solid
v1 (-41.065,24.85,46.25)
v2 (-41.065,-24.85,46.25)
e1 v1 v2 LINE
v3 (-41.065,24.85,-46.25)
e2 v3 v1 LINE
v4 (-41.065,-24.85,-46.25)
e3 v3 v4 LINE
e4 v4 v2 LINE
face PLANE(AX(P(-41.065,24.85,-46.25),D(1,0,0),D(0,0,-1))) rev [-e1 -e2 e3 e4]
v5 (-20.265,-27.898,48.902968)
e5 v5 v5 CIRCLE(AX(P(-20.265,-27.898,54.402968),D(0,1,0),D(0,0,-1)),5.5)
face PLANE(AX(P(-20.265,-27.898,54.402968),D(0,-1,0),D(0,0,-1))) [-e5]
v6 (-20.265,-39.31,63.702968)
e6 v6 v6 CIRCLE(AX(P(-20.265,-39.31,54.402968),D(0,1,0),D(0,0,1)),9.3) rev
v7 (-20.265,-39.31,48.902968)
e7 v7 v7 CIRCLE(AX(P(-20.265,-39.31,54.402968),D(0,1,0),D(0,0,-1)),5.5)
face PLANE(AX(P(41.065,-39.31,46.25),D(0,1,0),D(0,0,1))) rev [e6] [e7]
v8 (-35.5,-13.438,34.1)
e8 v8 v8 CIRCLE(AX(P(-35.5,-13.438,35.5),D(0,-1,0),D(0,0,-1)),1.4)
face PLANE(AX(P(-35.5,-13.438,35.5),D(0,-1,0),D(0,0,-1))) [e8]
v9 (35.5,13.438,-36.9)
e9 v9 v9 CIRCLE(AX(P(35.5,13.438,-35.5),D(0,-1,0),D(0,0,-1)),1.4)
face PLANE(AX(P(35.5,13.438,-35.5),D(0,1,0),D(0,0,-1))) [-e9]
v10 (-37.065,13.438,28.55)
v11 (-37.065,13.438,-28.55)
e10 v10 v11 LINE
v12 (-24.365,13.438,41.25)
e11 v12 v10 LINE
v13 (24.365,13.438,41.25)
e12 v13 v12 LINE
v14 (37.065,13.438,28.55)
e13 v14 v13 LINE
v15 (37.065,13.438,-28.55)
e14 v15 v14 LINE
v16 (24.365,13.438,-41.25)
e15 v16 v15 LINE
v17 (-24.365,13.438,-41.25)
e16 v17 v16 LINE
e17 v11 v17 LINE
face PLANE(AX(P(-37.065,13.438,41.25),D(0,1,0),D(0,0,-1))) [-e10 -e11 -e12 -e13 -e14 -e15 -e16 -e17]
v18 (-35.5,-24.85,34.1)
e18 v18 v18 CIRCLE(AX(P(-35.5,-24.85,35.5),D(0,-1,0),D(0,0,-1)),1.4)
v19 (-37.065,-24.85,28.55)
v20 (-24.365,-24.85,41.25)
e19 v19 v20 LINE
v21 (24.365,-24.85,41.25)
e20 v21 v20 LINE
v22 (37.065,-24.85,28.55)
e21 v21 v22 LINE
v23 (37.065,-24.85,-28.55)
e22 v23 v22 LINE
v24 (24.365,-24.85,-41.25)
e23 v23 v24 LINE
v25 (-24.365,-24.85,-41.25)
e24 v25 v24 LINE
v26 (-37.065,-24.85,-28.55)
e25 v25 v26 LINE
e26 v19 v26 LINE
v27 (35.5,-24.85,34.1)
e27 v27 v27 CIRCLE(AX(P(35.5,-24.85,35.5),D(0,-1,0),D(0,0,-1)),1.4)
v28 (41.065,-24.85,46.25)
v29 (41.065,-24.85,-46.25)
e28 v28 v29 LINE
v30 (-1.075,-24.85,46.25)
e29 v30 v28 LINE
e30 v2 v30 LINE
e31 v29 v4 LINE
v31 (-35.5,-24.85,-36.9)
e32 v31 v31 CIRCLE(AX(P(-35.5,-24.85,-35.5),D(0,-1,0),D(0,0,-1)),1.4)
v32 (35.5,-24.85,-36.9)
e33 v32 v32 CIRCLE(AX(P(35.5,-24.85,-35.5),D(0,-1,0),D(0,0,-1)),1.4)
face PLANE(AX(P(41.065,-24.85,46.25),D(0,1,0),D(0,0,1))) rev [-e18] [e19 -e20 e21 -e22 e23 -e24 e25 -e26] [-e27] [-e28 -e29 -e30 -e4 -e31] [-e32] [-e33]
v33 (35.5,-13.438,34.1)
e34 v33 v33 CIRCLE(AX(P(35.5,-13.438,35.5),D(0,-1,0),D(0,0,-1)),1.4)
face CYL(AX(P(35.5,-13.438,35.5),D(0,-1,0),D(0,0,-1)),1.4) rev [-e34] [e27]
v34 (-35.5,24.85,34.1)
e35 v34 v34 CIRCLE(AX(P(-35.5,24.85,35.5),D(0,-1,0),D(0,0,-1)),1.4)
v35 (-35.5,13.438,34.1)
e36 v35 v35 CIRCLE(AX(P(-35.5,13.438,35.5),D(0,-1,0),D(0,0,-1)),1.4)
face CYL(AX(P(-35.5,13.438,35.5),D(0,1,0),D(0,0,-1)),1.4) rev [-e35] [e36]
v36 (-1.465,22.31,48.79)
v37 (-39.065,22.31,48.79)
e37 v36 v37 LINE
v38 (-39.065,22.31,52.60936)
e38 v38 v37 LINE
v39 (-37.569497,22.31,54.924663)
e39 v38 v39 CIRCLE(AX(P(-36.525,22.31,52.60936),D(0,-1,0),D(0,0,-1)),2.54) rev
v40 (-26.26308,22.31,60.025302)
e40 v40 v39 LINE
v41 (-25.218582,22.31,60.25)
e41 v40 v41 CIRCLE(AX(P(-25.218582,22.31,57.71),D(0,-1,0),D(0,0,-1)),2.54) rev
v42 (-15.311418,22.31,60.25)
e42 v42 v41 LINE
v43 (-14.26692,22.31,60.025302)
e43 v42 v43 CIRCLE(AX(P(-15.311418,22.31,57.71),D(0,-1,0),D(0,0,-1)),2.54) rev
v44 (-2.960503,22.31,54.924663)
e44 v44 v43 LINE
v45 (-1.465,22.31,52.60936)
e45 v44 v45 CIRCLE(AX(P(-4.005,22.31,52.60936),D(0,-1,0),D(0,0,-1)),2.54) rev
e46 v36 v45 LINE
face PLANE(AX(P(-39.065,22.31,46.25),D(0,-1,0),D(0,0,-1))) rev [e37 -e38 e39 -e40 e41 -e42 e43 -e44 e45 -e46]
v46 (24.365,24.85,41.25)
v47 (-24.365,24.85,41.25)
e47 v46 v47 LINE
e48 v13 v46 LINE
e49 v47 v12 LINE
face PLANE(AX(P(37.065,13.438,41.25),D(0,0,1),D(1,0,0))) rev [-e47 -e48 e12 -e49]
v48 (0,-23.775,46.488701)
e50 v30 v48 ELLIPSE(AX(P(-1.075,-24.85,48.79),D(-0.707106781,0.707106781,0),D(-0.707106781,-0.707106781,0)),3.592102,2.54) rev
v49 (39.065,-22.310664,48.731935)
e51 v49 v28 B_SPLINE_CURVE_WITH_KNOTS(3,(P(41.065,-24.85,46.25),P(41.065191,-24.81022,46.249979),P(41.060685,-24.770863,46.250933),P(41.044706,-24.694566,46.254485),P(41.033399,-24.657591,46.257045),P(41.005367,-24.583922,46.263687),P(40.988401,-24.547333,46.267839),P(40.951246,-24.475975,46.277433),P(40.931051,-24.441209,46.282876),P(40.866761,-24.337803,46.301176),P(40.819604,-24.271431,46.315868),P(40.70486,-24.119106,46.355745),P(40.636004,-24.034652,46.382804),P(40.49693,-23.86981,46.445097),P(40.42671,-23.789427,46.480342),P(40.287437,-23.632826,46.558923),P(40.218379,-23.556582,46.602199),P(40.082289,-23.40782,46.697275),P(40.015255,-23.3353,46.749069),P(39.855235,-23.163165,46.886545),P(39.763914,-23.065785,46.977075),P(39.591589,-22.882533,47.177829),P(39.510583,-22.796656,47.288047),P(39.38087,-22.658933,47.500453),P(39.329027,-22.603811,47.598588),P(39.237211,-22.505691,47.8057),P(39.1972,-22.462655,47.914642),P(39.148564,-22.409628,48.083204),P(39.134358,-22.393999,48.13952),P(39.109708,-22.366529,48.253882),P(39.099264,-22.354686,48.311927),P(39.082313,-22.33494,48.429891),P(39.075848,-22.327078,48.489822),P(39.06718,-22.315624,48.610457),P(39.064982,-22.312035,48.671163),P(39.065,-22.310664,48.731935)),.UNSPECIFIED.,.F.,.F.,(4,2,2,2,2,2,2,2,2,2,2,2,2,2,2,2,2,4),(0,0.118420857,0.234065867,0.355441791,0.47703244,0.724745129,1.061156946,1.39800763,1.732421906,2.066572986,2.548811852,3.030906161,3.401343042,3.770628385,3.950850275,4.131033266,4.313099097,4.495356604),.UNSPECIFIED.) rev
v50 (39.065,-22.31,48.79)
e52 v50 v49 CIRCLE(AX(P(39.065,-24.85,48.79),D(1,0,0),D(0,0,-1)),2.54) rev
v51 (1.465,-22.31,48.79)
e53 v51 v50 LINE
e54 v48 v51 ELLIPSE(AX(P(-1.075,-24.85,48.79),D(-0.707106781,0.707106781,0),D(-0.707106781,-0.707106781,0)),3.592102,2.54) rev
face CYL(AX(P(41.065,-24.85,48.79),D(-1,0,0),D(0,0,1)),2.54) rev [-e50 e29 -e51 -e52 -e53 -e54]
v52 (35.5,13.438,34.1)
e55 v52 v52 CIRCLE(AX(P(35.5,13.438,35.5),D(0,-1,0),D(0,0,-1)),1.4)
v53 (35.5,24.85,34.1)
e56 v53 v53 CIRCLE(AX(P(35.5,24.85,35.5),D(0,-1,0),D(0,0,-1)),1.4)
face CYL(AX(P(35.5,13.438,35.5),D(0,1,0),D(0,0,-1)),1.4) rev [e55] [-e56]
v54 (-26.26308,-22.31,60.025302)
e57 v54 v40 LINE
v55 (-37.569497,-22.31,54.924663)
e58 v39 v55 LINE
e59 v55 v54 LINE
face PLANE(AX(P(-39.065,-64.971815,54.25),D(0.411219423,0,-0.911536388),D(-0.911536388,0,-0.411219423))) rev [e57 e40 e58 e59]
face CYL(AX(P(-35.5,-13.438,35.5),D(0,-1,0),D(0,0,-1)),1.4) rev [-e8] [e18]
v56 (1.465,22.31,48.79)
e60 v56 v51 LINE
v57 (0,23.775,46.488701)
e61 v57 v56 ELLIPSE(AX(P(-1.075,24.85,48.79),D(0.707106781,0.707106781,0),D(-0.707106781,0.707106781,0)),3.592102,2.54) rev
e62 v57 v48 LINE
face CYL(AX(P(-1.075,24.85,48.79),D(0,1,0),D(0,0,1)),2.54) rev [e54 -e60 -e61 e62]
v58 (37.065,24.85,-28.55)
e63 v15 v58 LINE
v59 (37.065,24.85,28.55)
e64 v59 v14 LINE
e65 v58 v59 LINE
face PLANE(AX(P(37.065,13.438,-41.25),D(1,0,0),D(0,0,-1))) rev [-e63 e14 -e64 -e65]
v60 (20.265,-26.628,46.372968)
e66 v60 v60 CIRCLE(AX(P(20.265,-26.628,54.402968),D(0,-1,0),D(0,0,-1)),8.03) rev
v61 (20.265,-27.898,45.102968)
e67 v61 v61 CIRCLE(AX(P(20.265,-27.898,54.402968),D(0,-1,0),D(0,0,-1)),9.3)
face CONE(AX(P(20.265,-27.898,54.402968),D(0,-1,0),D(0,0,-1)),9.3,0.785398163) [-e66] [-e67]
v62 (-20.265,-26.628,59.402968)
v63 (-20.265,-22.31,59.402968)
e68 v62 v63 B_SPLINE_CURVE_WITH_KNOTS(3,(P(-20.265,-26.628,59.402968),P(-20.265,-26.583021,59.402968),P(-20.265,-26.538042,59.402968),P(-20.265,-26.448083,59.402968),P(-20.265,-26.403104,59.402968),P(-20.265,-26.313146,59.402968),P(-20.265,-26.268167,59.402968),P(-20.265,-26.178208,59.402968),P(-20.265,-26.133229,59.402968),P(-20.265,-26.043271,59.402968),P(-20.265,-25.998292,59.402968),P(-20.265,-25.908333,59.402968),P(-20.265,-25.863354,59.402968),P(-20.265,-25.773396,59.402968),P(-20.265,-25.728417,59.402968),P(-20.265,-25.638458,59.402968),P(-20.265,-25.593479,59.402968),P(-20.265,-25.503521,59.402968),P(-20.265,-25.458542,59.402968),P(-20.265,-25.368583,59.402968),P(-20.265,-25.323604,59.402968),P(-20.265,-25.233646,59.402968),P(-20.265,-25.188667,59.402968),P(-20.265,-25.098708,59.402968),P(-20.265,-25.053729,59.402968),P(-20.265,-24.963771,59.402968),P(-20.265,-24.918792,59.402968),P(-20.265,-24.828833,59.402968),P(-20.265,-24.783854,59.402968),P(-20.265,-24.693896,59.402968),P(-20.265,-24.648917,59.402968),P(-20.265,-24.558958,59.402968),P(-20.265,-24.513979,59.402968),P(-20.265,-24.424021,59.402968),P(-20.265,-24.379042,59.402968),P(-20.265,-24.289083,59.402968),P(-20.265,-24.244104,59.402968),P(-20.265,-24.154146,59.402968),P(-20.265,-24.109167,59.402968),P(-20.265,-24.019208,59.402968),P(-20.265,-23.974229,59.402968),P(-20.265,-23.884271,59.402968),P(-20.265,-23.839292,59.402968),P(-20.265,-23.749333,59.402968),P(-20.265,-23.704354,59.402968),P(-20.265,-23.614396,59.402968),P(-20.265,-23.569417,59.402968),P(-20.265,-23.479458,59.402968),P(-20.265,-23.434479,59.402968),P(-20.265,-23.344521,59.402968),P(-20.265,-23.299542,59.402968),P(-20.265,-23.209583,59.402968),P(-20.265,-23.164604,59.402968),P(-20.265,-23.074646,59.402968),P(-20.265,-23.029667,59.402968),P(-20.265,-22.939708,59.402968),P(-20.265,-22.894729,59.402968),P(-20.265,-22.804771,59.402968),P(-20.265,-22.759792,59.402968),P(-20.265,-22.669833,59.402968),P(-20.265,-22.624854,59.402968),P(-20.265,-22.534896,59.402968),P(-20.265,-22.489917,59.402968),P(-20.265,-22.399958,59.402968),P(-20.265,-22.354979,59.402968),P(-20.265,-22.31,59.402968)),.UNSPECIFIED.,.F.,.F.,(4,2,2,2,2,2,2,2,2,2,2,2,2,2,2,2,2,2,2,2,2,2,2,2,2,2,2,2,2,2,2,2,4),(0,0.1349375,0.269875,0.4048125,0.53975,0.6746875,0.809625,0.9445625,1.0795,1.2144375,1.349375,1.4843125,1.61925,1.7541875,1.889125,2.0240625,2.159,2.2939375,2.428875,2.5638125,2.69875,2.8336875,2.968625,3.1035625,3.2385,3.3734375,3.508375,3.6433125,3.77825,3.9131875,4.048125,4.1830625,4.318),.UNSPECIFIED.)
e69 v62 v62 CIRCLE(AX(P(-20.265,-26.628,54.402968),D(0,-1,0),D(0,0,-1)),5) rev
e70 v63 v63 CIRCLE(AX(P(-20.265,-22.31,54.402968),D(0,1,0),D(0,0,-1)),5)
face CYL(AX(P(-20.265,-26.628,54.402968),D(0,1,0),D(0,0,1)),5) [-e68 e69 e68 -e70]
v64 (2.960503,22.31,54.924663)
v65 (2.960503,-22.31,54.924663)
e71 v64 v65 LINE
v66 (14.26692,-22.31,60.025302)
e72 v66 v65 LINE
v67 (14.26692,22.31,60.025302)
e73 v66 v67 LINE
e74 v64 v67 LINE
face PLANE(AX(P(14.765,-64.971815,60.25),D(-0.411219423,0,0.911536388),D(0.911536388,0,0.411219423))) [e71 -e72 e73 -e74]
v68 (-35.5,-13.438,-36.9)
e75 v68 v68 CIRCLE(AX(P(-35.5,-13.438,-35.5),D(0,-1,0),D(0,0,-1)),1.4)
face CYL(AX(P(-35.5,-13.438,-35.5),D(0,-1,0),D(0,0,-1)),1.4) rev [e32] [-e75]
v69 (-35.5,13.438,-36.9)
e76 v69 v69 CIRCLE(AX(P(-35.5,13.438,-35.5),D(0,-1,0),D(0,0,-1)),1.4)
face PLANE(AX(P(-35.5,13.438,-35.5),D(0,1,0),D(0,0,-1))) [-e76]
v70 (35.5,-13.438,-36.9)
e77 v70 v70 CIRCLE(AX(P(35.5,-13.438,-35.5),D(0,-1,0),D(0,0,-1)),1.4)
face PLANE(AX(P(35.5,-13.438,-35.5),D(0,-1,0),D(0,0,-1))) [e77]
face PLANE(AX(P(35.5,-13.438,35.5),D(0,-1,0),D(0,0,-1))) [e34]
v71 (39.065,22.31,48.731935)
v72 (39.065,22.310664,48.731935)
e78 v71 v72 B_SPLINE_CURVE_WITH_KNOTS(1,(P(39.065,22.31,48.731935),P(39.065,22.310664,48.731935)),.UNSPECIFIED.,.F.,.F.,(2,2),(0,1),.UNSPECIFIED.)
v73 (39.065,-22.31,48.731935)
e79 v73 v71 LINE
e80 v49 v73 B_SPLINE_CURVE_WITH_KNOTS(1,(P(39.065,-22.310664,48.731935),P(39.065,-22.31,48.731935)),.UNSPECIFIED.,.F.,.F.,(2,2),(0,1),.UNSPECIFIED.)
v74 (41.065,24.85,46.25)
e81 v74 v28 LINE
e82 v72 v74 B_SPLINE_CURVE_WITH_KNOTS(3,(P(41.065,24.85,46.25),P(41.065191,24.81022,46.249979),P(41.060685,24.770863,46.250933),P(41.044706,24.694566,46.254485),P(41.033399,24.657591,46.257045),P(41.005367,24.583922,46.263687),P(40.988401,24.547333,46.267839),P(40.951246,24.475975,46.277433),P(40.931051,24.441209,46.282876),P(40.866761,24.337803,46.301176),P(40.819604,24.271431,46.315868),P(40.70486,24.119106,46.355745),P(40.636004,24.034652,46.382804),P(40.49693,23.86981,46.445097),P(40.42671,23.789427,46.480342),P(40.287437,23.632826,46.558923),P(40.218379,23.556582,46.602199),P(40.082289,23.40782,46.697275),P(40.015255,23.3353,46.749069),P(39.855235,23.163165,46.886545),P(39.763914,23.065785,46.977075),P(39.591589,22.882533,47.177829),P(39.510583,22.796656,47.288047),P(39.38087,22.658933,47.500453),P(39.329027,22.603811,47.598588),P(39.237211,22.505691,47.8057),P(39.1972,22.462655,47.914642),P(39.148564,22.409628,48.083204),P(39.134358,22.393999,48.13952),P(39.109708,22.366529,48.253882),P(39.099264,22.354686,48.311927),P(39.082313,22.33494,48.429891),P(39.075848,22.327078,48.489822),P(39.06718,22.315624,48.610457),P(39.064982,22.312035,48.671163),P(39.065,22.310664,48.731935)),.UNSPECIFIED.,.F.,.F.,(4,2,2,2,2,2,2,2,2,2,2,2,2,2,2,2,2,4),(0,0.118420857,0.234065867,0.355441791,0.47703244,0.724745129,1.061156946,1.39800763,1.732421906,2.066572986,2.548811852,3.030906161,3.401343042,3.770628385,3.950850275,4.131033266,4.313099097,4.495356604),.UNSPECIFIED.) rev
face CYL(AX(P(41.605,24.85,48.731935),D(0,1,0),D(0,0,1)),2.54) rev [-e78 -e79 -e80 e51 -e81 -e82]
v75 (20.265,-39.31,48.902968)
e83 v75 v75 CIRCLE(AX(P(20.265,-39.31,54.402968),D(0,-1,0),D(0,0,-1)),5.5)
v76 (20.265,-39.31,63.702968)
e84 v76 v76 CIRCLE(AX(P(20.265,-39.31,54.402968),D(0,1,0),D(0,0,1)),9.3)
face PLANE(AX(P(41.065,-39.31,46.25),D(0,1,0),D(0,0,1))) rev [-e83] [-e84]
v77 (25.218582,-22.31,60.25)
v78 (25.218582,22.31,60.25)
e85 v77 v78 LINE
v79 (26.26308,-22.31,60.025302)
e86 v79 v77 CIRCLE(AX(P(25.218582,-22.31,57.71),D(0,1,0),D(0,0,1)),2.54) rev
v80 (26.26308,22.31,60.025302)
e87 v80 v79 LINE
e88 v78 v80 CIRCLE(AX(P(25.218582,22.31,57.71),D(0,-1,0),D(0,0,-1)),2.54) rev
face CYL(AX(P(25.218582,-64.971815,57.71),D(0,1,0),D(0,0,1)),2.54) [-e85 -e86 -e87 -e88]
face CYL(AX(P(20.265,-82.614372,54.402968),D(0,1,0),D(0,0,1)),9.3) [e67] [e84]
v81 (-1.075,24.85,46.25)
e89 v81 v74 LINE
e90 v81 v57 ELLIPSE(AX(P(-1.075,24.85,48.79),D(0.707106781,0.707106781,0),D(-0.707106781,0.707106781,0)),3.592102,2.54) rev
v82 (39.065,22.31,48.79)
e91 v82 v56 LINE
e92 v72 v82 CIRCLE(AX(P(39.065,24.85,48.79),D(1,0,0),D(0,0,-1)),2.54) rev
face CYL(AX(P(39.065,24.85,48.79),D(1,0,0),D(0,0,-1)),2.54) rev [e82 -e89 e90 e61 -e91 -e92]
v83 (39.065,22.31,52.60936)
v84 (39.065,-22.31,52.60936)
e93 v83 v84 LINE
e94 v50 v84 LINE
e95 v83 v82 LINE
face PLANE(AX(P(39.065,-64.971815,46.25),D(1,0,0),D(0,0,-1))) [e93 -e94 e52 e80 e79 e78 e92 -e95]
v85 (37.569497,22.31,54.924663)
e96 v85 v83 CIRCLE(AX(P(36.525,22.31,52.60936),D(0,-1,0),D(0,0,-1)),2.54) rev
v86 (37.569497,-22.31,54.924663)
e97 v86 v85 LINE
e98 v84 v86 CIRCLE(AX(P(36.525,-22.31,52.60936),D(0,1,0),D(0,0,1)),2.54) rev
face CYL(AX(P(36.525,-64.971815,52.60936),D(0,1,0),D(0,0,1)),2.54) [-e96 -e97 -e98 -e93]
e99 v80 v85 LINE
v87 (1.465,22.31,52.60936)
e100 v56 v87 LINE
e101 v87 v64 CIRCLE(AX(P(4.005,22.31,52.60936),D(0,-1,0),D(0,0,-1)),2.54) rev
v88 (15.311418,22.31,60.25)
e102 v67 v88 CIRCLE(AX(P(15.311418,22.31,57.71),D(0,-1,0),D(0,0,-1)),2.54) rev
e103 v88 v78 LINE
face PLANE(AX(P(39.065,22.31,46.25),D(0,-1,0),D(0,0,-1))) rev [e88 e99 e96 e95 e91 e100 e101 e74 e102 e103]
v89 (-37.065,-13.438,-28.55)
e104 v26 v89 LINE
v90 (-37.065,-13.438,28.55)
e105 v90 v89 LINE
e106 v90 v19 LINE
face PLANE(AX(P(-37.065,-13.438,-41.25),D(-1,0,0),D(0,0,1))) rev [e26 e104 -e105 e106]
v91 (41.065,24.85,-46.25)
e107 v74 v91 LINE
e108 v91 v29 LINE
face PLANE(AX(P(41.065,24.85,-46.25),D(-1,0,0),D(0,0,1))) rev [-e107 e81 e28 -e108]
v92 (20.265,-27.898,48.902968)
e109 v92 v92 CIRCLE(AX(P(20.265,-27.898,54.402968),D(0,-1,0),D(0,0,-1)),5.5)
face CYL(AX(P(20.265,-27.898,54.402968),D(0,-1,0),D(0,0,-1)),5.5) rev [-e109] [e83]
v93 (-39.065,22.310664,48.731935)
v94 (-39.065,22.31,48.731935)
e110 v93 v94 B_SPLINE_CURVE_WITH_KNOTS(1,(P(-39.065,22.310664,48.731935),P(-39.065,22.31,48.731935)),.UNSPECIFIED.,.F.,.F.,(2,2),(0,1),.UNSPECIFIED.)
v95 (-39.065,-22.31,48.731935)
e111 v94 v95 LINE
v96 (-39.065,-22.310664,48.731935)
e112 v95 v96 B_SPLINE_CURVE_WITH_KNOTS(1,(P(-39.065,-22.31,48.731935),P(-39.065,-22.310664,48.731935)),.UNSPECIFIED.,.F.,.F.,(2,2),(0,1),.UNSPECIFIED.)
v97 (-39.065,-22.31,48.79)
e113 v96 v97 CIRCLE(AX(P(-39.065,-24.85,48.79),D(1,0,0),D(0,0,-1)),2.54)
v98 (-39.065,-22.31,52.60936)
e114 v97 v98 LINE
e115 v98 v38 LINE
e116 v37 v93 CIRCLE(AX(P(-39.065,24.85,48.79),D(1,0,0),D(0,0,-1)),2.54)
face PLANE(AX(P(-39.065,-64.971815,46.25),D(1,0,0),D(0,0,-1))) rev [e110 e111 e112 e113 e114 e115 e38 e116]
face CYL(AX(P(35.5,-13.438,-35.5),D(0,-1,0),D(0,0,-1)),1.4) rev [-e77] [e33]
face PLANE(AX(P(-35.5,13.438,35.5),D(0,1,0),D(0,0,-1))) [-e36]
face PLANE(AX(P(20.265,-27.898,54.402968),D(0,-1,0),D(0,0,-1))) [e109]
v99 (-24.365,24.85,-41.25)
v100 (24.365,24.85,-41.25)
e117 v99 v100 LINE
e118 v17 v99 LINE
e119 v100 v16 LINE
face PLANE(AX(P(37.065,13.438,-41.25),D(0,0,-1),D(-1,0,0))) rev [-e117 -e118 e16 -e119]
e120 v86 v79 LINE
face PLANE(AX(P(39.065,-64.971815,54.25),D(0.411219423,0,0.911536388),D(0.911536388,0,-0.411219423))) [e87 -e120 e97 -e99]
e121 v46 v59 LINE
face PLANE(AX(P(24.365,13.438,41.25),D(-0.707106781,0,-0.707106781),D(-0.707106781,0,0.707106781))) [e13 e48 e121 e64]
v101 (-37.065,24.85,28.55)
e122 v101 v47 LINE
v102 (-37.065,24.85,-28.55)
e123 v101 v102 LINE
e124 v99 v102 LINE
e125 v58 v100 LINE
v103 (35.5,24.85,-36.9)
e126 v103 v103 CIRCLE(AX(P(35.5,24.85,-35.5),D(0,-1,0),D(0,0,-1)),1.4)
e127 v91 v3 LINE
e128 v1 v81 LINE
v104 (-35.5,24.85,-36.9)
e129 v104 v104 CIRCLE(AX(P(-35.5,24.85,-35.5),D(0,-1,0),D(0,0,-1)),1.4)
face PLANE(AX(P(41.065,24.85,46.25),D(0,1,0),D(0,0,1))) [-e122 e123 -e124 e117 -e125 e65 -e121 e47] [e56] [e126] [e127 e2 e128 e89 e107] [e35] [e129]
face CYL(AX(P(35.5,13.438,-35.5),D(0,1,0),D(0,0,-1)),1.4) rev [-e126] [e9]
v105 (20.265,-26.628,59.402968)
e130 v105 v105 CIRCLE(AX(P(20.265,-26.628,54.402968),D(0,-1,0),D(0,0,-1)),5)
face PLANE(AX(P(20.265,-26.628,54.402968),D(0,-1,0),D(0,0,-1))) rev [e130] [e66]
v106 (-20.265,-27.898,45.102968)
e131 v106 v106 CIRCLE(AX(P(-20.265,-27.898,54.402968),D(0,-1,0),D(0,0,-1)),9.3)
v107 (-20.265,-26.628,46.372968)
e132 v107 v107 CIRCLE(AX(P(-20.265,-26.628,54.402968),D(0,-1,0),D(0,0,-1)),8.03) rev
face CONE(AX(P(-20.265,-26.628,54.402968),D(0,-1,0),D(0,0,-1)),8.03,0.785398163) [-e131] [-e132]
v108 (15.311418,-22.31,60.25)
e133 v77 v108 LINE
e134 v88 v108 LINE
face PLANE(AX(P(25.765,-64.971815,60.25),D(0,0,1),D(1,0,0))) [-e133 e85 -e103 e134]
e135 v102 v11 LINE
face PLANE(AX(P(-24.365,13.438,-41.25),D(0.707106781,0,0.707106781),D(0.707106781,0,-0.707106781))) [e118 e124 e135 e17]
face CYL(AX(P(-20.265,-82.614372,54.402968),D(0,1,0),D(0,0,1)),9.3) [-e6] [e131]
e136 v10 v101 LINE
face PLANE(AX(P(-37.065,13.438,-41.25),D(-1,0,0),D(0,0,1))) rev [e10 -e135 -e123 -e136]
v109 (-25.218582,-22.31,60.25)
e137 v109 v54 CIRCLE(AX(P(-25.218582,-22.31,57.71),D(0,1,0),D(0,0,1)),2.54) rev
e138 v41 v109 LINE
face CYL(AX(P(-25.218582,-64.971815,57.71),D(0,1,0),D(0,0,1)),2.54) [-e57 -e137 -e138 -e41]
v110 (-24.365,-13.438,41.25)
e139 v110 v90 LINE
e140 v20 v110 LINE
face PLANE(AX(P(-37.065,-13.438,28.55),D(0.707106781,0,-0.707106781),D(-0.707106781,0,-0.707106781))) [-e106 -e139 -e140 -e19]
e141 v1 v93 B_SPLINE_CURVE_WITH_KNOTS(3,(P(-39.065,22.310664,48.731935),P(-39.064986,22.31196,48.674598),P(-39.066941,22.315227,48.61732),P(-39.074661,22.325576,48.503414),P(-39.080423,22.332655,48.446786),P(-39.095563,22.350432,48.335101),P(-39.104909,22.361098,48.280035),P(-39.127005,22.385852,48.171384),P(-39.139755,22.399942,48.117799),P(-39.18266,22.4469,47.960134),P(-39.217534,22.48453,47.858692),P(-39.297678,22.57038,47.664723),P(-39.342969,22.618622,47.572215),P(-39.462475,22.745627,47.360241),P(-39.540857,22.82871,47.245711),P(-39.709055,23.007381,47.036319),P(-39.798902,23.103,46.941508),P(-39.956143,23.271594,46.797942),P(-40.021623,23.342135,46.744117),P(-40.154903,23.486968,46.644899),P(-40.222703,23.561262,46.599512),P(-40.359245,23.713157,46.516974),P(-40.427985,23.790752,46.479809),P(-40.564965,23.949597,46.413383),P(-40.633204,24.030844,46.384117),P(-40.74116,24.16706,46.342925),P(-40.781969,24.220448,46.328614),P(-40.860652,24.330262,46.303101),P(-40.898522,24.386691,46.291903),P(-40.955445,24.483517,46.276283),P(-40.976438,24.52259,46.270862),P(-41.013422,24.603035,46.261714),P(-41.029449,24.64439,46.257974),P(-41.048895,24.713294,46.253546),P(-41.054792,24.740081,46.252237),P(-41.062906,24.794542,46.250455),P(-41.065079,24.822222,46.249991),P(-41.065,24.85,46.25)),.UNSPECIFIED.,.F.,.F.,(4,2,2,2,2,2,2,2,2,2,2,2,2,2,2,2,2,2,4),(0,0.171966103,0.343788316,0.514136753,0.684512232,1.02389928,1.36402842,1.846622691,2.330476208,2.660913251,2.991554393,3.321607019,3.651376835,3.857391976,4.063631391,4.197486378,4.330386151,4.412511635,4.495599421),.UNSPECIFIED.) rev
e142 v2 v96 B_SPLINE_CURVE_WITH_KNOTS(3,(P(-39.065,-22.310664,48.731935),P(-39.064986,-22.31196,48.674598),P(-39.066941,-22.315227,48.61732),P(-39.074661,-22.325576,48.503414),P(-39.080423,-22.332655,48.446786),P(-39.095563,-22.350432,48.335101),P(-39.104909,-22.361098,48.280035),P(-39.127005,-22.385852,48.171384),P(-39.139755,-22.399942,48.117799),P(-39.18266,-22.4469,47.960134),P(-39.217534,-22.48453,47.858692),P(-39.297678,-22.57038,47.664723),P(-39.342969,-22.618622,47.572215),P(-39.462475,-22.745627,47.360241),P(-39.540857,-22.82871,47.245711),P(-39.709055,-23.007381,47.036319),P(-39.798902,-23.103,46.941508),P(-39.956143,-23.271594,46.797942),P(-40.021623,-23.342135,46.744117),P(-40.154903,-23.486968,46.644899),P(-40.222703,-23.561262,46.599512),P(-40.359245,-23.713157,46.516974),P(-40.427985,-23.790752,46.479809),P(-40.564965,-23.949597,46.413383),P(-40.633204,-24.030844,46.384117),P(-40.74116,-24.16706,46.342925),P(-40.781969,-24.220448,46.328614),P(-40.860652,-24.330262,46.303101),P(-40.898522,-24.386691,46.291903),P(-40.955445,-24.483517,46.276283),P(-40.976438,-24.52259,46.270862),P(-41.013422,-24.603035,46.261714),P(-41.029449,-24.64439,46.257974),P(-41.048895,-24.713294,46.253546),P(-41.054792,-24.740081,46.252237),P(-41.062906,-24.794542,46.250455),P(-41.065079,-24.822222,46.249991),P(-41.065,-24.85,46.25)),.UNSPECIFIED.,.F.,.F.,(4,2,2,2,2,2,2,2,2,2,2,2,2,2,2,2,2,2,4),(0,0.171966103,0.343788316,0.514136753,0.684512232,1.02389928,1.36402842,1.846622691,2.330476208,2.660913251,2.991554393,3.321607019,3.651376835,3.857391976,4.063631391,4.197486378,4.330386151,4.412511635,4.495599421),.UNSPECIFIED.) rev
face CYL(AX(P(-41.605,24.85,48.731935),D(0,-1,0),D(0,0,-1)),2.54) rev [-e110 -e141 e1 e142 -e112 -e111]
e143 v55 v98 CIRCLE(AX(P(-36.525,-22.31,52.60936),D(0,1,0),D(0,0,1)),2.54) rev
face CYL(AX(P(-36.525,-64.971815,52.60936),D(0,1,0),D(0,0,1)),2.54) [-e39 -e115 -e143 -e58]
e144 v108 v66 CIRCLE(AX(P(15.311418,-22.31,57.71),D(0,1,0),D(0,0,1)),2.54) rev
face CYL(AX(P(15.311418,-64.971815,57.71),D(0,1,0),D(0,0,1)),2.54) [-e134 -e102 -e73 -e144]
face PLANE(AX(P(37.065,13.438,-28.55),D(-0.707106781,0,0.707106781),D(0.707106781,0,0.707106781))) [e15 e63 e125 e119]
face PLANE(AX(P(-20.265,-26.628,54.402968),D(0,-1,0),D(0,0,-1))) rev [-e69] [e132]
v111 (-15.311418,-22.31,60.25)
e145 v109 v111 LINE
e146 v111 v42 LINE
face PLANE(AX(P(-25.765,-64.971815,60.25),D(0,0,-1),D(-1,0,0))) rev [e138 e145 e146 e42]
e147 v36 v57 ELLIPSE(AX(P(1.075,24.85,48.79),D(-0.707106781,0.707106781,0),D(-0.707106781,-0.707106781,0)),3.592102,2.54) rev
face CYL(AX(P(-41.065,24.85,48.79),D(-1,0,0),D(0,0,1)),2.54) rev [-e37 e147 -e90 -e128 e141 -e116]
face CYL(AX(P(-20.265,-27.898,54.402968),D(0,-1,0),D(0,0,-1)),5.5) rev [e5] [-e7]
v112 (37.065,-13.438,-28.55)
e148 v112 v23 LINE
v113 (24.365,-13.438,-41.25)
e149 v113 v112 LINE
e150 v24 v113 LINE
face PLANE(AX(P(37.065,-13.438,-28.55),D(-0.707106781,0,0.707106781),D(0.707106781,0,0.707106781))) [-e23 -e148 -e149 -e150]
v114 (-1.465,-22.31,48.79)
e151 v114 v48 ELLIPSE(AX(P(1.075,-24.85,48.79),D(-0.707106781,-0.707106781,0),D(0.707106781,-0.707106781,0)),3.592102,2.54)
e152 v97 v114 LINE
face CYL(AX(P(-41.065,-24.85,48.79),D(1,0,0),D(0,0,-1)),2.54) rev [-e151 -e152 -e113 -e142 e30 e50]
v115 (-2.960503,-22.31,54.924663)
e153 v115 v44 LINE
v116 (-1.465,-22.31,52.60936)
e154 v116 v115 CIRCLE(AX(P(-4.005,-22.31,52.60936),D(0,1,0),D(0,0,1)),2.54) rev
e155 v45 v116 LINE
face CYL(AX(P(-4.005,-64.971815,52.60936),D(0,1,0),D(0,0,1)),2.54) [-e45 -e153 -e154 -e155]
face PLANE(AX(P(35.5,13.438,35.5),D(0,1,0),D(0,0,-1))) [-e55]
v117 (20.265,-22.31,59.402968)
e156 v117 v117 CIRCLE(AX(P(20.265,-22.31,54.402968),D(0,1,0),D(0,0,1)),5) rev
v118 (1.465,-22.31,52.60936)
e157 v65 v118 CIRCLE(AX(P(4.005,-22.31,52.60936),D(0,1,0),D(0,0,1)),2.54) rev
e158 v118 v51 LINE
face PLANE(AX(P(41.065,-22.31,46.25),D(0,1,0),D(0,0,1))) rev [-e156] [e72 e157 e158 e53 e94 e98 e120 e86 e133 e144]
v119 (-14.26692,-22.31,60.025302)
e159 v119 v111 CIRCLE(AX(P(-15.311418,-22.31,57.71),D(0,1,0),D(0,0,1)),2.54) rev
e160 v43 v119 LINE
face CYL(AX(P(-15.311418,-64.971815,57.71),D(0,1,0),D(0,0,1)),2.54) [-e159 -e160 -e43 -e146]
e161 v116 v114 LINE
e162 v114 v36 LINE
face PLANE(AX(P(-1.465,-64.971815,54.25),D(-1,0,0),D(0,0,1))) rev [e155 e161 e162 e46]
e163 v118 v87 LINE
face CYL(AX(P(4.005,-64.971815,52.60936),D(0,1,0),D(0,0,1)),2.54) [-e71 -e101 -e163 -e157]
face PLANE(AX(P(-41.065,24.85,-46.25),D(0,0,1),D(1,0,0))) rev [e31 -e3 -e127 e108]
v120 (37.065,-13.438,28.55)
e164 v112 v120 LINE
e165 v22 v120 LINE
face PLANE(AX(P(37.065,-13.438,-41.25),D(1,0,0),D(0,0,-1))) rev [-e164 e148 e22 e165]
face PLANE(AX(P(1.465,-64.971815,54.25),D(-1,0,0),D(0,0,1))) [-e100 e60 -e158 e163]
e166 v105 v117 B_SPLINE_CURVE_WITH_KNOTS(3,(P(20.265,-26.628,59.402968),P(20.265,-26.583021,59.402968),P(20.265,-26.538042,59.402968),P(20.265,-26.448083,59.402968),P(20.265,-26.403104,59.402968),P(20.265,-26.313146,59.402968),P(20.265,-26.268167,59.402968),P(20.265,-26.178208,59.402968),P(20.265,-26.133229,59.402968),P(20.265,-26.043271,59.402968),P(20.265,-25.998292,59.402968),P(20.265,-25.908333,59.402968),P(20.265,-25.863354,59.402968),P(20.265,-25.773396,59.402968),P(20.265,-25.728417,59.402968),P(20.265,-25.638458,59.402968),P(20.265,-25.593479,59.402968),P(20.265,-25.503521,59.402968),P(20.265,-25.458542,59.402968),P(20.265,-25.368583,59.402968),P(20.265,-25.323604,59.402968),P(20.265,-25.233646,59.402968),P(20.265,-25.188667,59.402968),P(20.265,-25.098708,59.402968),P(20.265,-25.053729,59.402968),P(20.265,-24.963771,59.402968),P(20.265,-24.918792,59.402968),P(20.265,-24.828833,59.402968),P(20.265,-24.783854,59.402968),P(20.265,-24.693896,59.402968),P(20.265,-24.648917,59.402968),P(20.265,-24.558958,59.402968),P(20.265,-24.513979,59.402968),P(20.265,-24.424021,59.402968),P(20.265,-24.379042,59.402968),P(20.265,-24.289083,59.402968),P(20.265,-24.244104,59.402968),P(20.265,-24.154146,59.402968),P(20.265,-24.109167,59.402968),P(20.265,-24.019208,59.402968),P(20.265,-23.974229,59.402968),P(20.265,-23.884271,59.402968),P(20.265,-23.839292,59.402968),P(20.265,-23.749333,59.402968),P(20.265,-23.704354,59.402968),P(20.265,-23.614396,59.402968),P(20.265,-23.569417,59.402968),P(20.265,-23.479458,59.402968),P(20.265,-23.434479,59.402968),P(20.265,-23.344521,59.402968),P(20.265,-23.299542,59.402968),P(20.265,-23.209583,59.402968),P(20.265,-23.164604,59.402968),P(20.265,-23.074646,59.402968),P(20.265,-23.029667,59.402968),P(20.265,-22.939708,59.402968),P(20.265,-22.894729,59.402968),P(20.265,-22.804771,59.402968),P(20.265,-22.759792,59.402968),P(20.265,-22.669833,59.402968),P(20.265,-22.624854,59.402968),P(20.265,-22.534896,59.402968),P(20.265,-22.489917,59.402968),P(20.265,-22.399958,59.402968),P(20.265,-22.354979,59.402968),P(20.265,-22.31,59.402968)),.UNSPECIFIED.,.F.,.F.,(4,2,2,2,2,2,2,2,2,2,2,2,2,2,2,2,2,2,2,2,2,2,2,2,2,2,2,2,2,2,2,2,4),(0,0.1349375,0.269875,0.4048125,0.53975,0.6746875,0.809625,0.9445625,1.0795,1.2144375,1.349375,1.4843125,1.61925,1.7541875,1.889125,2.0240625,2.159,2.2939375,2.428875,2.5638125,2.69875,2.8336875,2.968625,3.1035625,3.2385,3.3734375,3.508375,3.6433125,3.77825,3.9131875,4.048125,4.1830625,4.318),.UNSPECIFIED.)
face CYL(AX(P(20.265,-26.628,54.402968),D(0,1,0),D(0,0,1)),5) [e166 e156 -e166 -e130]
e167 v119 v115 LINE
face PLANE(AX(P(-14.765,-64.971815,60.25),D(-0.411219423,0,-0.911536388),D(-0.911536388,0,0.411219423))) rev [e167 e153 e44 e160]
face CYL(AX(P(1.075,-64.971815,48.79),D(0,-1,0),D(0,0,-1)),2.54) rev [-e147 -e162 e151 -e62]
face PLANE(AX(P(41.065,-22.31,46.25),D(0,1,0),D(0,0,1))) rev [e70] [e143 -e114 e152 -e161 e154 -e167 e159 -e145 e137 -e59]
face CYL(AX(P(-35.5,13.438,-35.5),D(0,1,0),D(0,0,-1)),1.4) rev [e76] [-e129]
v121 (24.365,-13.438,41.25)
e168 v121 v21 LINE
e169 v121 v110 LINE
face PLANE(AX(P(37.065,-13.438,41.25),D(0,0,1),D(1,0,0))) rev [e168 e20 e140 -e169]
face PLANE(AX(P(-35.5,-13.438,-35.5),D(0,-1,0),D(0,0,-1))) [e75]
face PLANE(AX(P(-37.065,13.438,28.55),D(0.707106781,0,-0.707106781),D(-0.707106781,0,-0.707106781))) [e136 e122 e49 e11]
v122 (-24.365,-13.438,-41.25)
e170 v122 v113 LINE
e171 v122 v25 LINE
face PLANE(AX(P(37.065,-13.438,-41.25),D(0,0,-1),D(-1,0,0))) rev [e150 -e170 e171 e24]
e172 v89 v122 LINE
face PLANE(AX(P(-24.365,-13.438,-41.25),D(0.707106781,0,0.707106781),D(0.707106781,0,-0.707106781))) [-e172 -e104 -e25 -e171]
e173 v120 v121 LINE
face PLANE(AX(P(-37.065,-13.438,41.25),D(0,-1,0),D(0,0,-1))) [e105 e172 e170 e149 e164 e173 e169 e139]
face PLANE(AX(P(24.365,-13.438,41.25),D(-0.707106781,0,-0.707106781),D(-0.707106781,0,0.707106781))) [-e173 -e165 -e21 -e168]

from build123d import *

# Parameters (mm, degrees)
SKETCH1_W           = 82.13
SKETCH1_H           = 92.5
BOSS_EXTRUDE1_DEPTH = 24.85
BOSS_EXTRUDE2_DEPTH = 44.62
FILLET1_R           = 2.54
FILLET3_R           = 2.54
SKETCH4_R           = 5
BOSS_EXTRUDE3_DEPTH = 4.318
SKETCH5_R           = 9.3
BOSS_EXTRUDE4_DEPTH = 12.682
CHAMFER1_SIZE       = 1.27
SKETCH6_R           = 5.5
CUT_EXTRUDE1_DEPTH  = 11.412
SKETCH7_W           = 74.13
SKETCH7_H           = 82.5
CUT_EXTRUDE2_DEPTH  = 11.412
CHAMFER2_SIZE       = 12.7
SKETCH8_R           = 1.4
CUT_EXTRUDE3_DEPTH  = 11.412
MIRROR2_START       = 13.438
MIRROR2_OUTLINE_R   = 1.4
MIRROR2_DEPTH       = 11.412


# Read off the part's stored shape, not the designer's step: Mirror1, Mirror2
with BuildPart() as part:
    # Sketch1 → Boss-Extrude1 (new, symmetric)
    with BuildSketch(Plane(origin=(0, 0, 0), x_dir=(1, 0, 0), z_dir=(0, 1, 0))):
        Rectangle(SKETCH1_W, SKETCH1_H)
    extrude(amount=BOSS_EXTRUDE1_DEPTH, both=True)

    # Sketch2 → Boss-Extrude2 (add)
    with BuildSketch(Plane(origin=(0, 22.31, 0), x_dir=(-1, 0, 0), z_dir=(0, 1, 0))):
        Polygon((-39.065, 46.25), (-39.065, 54.25), (-25.765, 60.25), (-14.765, 60.25), (-1.465, 54.25), (-1.465, 46.25), align=None)
    extrude(amount=-BOSS_EXTRUDE2_DEPTH)

    # Fillet1
    fillet1_edges = [part.edges().sort_by_distance(p)[0] for p in [
        (39.065, 0, 54.25),
        (25.765, 0, 60.25),
        (14.765, 0, 60.25),
        (1.465, 0, 54.25),
    ]]
    fillet(fillet1_edges, radius=FILLET1_R)

    # Fillet3
    # the kernel refuses this fillet: 2.54 mm, written as the material it adds along each edge
    with BuildSketch(Plane(origin=(1.465, 22.31, 46.25), x_dir=(-0.9999999982560405, 0, -5.9058605719345716e-05), z_dir=(0, -1, 0))) as fillet3_piece_1:
        with BuildLine():
            CenterArc((2.539699996, -2.539999996), FILLET3_R, 89.996616191, 90)
            Line((-0.0003, -2.539849987), (-0.0511, -2.539846987))
            ThreePointArc((-0.0511, -2.539846987), (-0.050875, -1.269921998), (-0.0508, 3e-06))
            Line((-0.0508, 3e-06), (3e-06, 0.0508))
            ThreePointArc((3e-06, 0.0508), (1.269927998, 0.050725), (2.539853005, 0.0508))
            Line((2.539853005, 0.0508), (2.539850004, 0))
        make_face()
    extrude(amount=44.62)
    with BuildSketch(Plane(origin=(39.065, 22.31, 46.25), x_dir=(-6.0439665752366e-05, 0, 0.9999999981735235), z_dir=(0, -1, 0))) as fillet3_piece_2:
        with BuildLine():
            CenterArc((2.481660341, -2.539999995), FILLET3_R, 89.996537062, 77.728056522)
            Line((-0.00026745, -1.999968105), (-0.049906006, -1.989167467))
            ThreePointArc((-0.049906006, -1.989167467), (-0.050860439, -0.999980986), (-0.0508, 3.07e-06))
            Line((-0.0508, 3.07e-06), (3.07e-06, 0.0508))
            ThreePointArc((3.07e-06, 0.0508), (1.240909994, 0.050725), (2.481816928, 0.0508))
            Line((2.481816928, 0.0508), (2.481813857, 0))
        make_face()
    extrude(amount=44.62)
    with BuildSketch(Plane(origin=(1.465, 22.31, 46.25), x_dir=(0, -5.9058605719345655e-05, 0.9999999982560405), z_dir=(1, 0, 0)), Plane(origin=(1.465, -22.31, 46.25), x_dir=(0, -0.9999999982560405, -5.905860571934574e-05), z_dir=(1, 0, 0))) as fillet3_piece_3:
        with BuildLine():
            CenterArc((2.539699996, -2.539999996), FILLET3_R, 89.996616191, 90)
            Line((-0.0003, -2.539849987), (-0.0511, -2.539846987))
            ThreePointArc((-0.0511, -2.539846987), (-0.050875, -1.269921998), (-0.0508, 3e-06))
            Line((-0.0508, 3e-06), (3e-06, 0.0508))
            ThreePointArc((3e-06, 0.0508), (1.269927998, 0.050725), (2.539853005, 0.0508))
            Line((2.539853005, 0.0508), (2.539850004, 0))
        make_face()
    extrude(amount=37.6)
    with BuildSketch(Plane(origin=(-4.884625011, 22.31, 46.25), x_dir=(0, -5.9058605719345655e-05, 0.9999999982560405), z_dir=(1, 0, 0))) as fillet3_piece_4a_section:
        with BuildLine():
            CenterArc((2.539699996, -2.539999996), FILLET3_R, 89.996616191, 90)
            Line((-0.0003, -2.539849987), (-0.0511, -2.539846987))
            ThreePointArc((-0.0511, -2.539846987), (-0.050875, -1.269921998), (-0.0508, 3e-06))
            Line((-0.0508, 3e-06), (3e-06, 0.0508))
            ThreePointArc((3e-06, 0.0508), (1.269927998, 0.050725), (2.539853005, 0.0508))
            Line((2.539853005, 0.0508), (2.539850004, 0))
        make_face()
    fillet3_piece_4a = extrude(amount=43.949625011, mode=Mode.PRIVATE)
    fillet3_piece_4a = split(fillet3_piece_4a, bisect_by=Plane(origin=(1.465, 22.885412994, 46.825412994), z_dir=(-1, 0, 0)), keep=Keep.TOP, mode=Mode.PRIVATE)
    with BuildSketch(Plane(origin=(1.465, 28.659625011, 46.25), x_dir=(-0.9999999982560405, 0, -5.9058605719345655e-05), z_dir=(0, -1, 0))) as fillet3_piece_4b_section:
        with BuildLine():
            CenterArc((2.539699996, -2.539999996), FILLET3_R, 89.996616191, 90)
            Line((-0.0003, -2.539849987), (-0.0511, -2.539846987))
            ThreePointArc((-0.0511, -2.539846987), (-0.050875, -1.269921998), (-0.0508, 3e-06))
            Line((-0.0508, 3e-06), (3e-06, 0.0508))
            ThreePointArc((3e-06, 0.0508), (1.269927998, 0.050725), (2.539853005, 0.0508))
            Line((2.539853005, 0.0508), (2.539850004, 0))
        make_face()
    fillet3_piece_4b = extrude(amount=50.969625011, mode=Mode.PRIVATE)
    fillet3_piece_4b = split(fillet3_piece_4b, bisect_by=Plane(origin=(0.889587006, 22.31, 46.825412994), z_dir=(0, 1, 0)), keep=Keep.TOP, mode=Mode.PRIVATE)
    fillet3_piece_4b = split(fillet3_piece_4b, bisect_by=Plane(origin=(0.889587006, 24.85, 46.825412994), z_dir=(0, -1, 0)), keep=Keep.TOP, mode=Mode.PRIVATE)
    fillet3_piece_4 = fillet3_piece_4a & fillet3_piece_4b
    add(fillet3_piece_4)
    with BuildSketch(Plane(origin=(-4.884625011, -22.31, 46.25), x_dir=(0, -0.9999999982560405, -5.905860571934574e-05), z_dir=(1, 0, 0))) as fillet3_piece_5a_section:
        with BuildLine():
            CenterArc((2.539699996, -2.539999996), FILLET3_R, 89.996616191, 90)
            Line((-0.0003, -2.539849987), (-0.0511, -2.539846987))
            ThreePointArc((-0.0511, -2.539846987), (-0.050875, -1.269921998), (-0.0508, 3e-06))
            Line((-0.0508, 3e-06), (3e-06, 0.0508))
            ThreePointArc((3e-06, 0.0508), (1.269927998, 0.050725), (2.539853005, 0.0508))
            Line((2.539853005, 0.0508), (2.539850004, 0))
        make_face()
    fillet3_piece_5a = extrude(amount=43.949625011, mode=Mode.PRIVATE)
    fillet3_piece_5a = split(fillet3_piece_5a, bisect_by=Plane(origin=(1.465, -22.885412994, 46.825412994), z_dir=(-1, 0, 0)), keep=Keep.TOP, mode=Mode.PRIVATE)
    with BuildSketch(Plane(origin=(1.465, 22.31, 46.25), x_dir=(-0.9999999982560405, 0, -5.9058605719345716e-05), z_dir=(0, -1, 0))) as fillet3_piece_5b_section:
        with BuildLine():
            CenterArc((2.539699996, -2.539999996), FILLET3_R, 89.996616191, 90)
            Line((-0.0003, -2.539849987), (-0.0511, -2.539846987))
            ThreePointArc((-0.0511, -2.539846987), (-0.050875, -1.269921998), (-0.0508, 3e-06))
            Line((-0.0508, 3e-06), (3e-06, 0.0508))
            ThreePointArc((3e-06, 0.0508), (1.269927998, 0.050725), (2.539853005, 0.0508))
            Line((2.539853005, 0.0508), (2.539850004, 0))
        make_face()
    fillet3_piece_5b = extrude(amount=50.969625011, mode=Mode.PRIVATE)
    fillet3_piece_5b = split(fillet3_piece_5b, bisect_by=Plane(origin=(0.889587006, -24.85, 46.825412994), z_dir=(0, 1, 0)), keep=Keep.TOP, mode=Mode.PRIVATE)
    fillet3_piece_5b = split(fillet3_piece_5b, bisect_by=Plane(origin=(0.889587006, -22.31, 46.825412994), z_dir=(0, -1, 0)), keep=Keep.TOP, mode=Mode.PRIVATE)
    fillet3_piece_5 = fillet3_piece_5a & fillet3_piece_5b
    add(fillet3_piece_5)
    with BuildSketch(Plane(origin=(39.065, 28.514534643, 46.25), x_dir=(-6.043966575255531e-05, 0, 0.9999999981735235), z_dir=(0, -1, 0))) as fillet3_piece_6a_section:
        with BuildLine():
            CenterArc((2.481660341, -2.539999995), FILLET3_R, 89.996537062, 77.728056522)
            Line((-0.00026745, -1.999968105), (-0.049906006, -1.989167467))
            ThreePointArc((-0.049906006, -1.989167467), (-0.050860439, -0.999980986), (-0.0508, 3.07e-06))
            Line((-0.0508, 3.07e-06), (3.07e-06, 0.0508))
            ThreePointArc((3.07e-06, 0.0508), (1.240909994, 0.050725), (2.481816928, 0.0508))
            Line((2.481816928, 0.0508), (2.481813857, 0))
        make_face()
    fillet3_piece_6a = extrude(amount=50.824534643, mode=Mode.PRIVATE)
    fillet3_piece_6a = split(fillet3_piece_6a, bisect_by=Plane(origin=(39.565672123, 22.31, 46.830384654), z_dir=(0, 1, 0)), keep=Keep.TOP, mode=Mode.PRIVATE)
    fillet3_piece_6a = split(fillet3_piece_6a, bisect_by=Plane(origin=(39.565672123, 24.85, 46.830384654), z_dir=(0, -1, 0)), keep=Keep.TOP, mode=Mode.PRIVATE)
    with BuildSketch(Plane(origin=(1.465, 22.31, 46.25), x_dir=(0, -5.9058605719345655e-05, 0.9999999982560405), z_dir=(1, 0, 0))) as fillet3_piece_6b_section:
        with BuildLine():
            CenterArc((2.539699996, -2.539999996), FILLET3_R, 89.996616191, 90)
            Line((-0.0003, -2.539849987), (-0.0511, -2.539846987))
            ThreePointArc((-0.0511, -2.539846987), (-0.050875, -1.269921998), (-0.0508, 3e-06))
            Line((-0.0508, 3e-06), (3e-06, 0.0508))
            ThreePointArc((3e-06, 0.0508), (1.269927998, 0.050725), (2.539853005, 0.0508))
            Line((2.539853005, 0.0508), (2.539850004, 0))
        make_face()
    fillet3_piece_6b = extrude(amount=43.949625011, mode=Mode.PRIVATE)
    fillet3_piece_6b = split(fillet3_piece_6b, bisect_by=Plane(origin=(39.065, 22.885412994, 46.825412994), z_dir=(1, 0, 0)), keep=Keep.TOP, mode=Mode.PRIVATE)
    fillet3_piece_6b = split(fillet3_piece_6b, bisect_by=Plane(origin=(41.065, 22.885412994, 46.825412994), z_dir=(-1, 0, 0)), keep=Keep.TOP, mode=Mode.PRIVATE)
    fillet3_piece_6 = fillet3_piece_6a & fillet3_piece_6b
    add(fillet3_piece_6)
    with BuildSketch(Plane(origin=(39.065, 22.31, 46.25), x_dir=(-6.0439665752366e-05, 0, 0.9999999981735235), z_dir=(0, -1, 0))) as fillet3_piece_7a_section:
        with BuildLine():
            CenterArc((2.481660341, -2.539999995), FILLET3_R, 89.996537062, 77.728056522)
            Line((-0.00026745, -1.999968105), (-0.049906006, -1.989167467))
            ThreePointArc((-0.049906006, -1.989167467), (-0.050860439, -0.999980986), (-0.0508, 3.07e-06))
            Line((-0.0508, 3.07e-06), (3.07e-06, 0.0508))
            ThreePointArc((3.07e-06, 0.0508), (1.240909994, 0.050725), (2.481816928, 0.0508))
            Line((2.481816928, 0.0508), (2.481813857, 0))
        make_face()
    fillet3_piece_7a = extrude(amount=50.824534643, mode=Mode.PRIVATE)
    fillet3_piece_7a = split(fillet3_piece_7a, bisect_by=Plane(origin=(39.565672123, -22.31, 46.830384654), z_dir=(0, -1, 0)), keep=Keep.TOP, mode=Mode.PRIVATE)
    fillet3_piece_7a = split(fillet3_piece_7a, bisect_by=Plane(origin=(39.565672123, -24.85, 46.830384654), z_dir=(0, 1, 0)), keep=Keep.TOP, mode=Mode.PRIVATE)
    with BuildSketch(Plane(origin=(1.465, -22.31, 46.25), x_dir=(0, -0.9999999982560405, -5.905860571934574e-05), z_dir=(1, 0, 0))) as fillet3_piece_7b_section:
        with BuildLine():
            CenterArc((2.539699996, -2.539999996), FILLET3_R, 89.996616191, 90)
            Line((-0.0003, -2.539849987), (-0.0511, -2.539846987))
            ThreePointArc((-0.0511, -2.539846987), (-0.050875, -1.269921998), (-0.0508, 3e-06))
            Line((-0.0508, 3e-06), (3e-06, 0.0508))
            ThreePointArc((3e-06, 0.0508), (1.269927998, 0.050725), (2.539853005, 0.0508))
            Line((2.539853005, 0.0508), (2.539850004, 0))
        make_face()
    fillet3_piece_7b = extrude(amount=43.949625011, mode=Mode.PRIVATE)
    fillet3_piece_7b = split(fillet3_piece_7b, bisect_by=Plane(origin=(39.065, -22.885412994, 46.825412994), z_dir=(1, 0, 0)), keep=Keep.TOP, mode=Mode.PRIVATE)
    fillet3_piece_7b = split(fillet3_piece_7b, bisect_by=Plane(origin=(41.065, -22.885412994, 46.825412994), z_dir=(-1, 0, 0)), keep=Keep.TOP, mode=Mode.PRIVATE)
    fillet3_piece_7 = fillet3_piece_7a & fillet3_piece_7b
    add(fillet3_piece_7)

    # Sketch4 → Boss-Extrude3 (add)
    with BuildSketch(Plane.XZ.offset(22.31)):
        with Locations(Location((20.265, 54.402968129, 0), (0, 0, 90))):
            Circle(SKETCH4_R)
    extrude(amount=BOSS_EXTRUDE3_DEPTH)

    # Sketch5 → Boss-Extrude4 (add)
    with BuildSketch(Plane.XZ.offset(26.628)):
        with Locations(Location((20.265, 54.402968129, 0), (0, 0, 90))):
            Circle(SKETCH5_R)
    extrude(amount=BOSS_EXTRUDE4_DEPTH)

    # Chamfer1
    chamfer1_edges = [part.edges().sort_by_distance(p)[0] for p in [
        (20.265, -26.628, 45.102968129),
    ]]
    chamfer(chamfer1_edges, length=CHAMFER1_SIZE)

    # Sketch6 → Cut-Extrude1 (cut)
    with BuildSketch(Plane.XZ.offset(39.31)):
        with Locations(Location((20.265, 54.402968129, 0), (0, 0, 270))):
            Circle(SKETCH6_R)
    extrude(amount=-CUT_EXTRUDE1_DEPTH, mode=Mode.SUBTRACT)

    # Mirror1: part across plane


with BuildPart() as part_1:
    add(part.part)
    add(part.part.mirror(Plane(origin=(0, 0, 0), x_dir=(0, 0, 1), z_dir=(1, 0, 0))))

    # Sketch7 → Cut-Extrude2 (cut)
    with BuildSketch(Plane.XZ.offset(24.85)):
        Rectangle(SKETCH7_W, SKETCH7_H)
    extrude(amount=-CUT_EXTRUDE2_DEPTH, mode=Mode.SUBTRACT)

    # Chamfer2
    chamfer2_edges = [part_1.edges().sort_by_distance(p)[0] for p in [
        (-37.065, -19.144, -41.25),
        (-37.065, -19.144, 41.25),
        (37.065, -19.144, 41.25),
        (37.065, -19.144, -41.25),
    ]]
    chamfer(chamfer2_edges, length=CHAMFER2_SIZE)

    # Sketch8 → Cut-Extrude3 (cut)
    with BuildSketch(Plane.XZ.offset(24.85)):
        with Locations(Location((-35.5, 35.5, 0), (0, 0, 270))):
            Circle(SKETCH8_R)
        with Locations(Location((35.5, 35.5, 0), (0, 0, 270))):
            Circle(SKETCH8_R)
        with Locations(Location((35.5, -35.5, 0), (0, 0, 270))):
            Circle(SKETCH8_R)
        with Locations(Location((-35.5, -35.5, 0), (0, 0, 270))):
            Circle(SKETCH8_R)
    extrude(amount=-CUT_EXTRUDE3_DEPTH, mode=Mode.SUBTRACT)

    # Mirror2 outline → Mirror2 (cut)
    with BuildSketch(Plane(origin=(0, 0, 0), x_dir=(1, 0, 0), z_dir=(0, 1, 0)).offset(MIRROR2_START)):
        Polygon((-24.365, 41.25), (-37.065, 28.55), (-37.065, -28.55), (-24.365, -41.25), (24.365, -41.25), (37.065, -28.55), (37.065, 28.55), (24.365, 41.25), align=None)
        with Locations((-35.5, -35.5)):
            Circle(MIRROR2_OUTLINE_R)
        with Locations((35.5, -35.5)):
            Circle(MIRROR2_OUTLINE_R)
        with Locations((35.5, 35.5)):
            Circle(MIRROR2_OUTLINE_R)
        with Locations((-35.5, 35.5)):
            Circle(MIRROR2_OUTLINE_R)
    extrude(amount=MIRROR2_DEPTH, mode=Mode.SUBTRACT)


solid = part_1.part
